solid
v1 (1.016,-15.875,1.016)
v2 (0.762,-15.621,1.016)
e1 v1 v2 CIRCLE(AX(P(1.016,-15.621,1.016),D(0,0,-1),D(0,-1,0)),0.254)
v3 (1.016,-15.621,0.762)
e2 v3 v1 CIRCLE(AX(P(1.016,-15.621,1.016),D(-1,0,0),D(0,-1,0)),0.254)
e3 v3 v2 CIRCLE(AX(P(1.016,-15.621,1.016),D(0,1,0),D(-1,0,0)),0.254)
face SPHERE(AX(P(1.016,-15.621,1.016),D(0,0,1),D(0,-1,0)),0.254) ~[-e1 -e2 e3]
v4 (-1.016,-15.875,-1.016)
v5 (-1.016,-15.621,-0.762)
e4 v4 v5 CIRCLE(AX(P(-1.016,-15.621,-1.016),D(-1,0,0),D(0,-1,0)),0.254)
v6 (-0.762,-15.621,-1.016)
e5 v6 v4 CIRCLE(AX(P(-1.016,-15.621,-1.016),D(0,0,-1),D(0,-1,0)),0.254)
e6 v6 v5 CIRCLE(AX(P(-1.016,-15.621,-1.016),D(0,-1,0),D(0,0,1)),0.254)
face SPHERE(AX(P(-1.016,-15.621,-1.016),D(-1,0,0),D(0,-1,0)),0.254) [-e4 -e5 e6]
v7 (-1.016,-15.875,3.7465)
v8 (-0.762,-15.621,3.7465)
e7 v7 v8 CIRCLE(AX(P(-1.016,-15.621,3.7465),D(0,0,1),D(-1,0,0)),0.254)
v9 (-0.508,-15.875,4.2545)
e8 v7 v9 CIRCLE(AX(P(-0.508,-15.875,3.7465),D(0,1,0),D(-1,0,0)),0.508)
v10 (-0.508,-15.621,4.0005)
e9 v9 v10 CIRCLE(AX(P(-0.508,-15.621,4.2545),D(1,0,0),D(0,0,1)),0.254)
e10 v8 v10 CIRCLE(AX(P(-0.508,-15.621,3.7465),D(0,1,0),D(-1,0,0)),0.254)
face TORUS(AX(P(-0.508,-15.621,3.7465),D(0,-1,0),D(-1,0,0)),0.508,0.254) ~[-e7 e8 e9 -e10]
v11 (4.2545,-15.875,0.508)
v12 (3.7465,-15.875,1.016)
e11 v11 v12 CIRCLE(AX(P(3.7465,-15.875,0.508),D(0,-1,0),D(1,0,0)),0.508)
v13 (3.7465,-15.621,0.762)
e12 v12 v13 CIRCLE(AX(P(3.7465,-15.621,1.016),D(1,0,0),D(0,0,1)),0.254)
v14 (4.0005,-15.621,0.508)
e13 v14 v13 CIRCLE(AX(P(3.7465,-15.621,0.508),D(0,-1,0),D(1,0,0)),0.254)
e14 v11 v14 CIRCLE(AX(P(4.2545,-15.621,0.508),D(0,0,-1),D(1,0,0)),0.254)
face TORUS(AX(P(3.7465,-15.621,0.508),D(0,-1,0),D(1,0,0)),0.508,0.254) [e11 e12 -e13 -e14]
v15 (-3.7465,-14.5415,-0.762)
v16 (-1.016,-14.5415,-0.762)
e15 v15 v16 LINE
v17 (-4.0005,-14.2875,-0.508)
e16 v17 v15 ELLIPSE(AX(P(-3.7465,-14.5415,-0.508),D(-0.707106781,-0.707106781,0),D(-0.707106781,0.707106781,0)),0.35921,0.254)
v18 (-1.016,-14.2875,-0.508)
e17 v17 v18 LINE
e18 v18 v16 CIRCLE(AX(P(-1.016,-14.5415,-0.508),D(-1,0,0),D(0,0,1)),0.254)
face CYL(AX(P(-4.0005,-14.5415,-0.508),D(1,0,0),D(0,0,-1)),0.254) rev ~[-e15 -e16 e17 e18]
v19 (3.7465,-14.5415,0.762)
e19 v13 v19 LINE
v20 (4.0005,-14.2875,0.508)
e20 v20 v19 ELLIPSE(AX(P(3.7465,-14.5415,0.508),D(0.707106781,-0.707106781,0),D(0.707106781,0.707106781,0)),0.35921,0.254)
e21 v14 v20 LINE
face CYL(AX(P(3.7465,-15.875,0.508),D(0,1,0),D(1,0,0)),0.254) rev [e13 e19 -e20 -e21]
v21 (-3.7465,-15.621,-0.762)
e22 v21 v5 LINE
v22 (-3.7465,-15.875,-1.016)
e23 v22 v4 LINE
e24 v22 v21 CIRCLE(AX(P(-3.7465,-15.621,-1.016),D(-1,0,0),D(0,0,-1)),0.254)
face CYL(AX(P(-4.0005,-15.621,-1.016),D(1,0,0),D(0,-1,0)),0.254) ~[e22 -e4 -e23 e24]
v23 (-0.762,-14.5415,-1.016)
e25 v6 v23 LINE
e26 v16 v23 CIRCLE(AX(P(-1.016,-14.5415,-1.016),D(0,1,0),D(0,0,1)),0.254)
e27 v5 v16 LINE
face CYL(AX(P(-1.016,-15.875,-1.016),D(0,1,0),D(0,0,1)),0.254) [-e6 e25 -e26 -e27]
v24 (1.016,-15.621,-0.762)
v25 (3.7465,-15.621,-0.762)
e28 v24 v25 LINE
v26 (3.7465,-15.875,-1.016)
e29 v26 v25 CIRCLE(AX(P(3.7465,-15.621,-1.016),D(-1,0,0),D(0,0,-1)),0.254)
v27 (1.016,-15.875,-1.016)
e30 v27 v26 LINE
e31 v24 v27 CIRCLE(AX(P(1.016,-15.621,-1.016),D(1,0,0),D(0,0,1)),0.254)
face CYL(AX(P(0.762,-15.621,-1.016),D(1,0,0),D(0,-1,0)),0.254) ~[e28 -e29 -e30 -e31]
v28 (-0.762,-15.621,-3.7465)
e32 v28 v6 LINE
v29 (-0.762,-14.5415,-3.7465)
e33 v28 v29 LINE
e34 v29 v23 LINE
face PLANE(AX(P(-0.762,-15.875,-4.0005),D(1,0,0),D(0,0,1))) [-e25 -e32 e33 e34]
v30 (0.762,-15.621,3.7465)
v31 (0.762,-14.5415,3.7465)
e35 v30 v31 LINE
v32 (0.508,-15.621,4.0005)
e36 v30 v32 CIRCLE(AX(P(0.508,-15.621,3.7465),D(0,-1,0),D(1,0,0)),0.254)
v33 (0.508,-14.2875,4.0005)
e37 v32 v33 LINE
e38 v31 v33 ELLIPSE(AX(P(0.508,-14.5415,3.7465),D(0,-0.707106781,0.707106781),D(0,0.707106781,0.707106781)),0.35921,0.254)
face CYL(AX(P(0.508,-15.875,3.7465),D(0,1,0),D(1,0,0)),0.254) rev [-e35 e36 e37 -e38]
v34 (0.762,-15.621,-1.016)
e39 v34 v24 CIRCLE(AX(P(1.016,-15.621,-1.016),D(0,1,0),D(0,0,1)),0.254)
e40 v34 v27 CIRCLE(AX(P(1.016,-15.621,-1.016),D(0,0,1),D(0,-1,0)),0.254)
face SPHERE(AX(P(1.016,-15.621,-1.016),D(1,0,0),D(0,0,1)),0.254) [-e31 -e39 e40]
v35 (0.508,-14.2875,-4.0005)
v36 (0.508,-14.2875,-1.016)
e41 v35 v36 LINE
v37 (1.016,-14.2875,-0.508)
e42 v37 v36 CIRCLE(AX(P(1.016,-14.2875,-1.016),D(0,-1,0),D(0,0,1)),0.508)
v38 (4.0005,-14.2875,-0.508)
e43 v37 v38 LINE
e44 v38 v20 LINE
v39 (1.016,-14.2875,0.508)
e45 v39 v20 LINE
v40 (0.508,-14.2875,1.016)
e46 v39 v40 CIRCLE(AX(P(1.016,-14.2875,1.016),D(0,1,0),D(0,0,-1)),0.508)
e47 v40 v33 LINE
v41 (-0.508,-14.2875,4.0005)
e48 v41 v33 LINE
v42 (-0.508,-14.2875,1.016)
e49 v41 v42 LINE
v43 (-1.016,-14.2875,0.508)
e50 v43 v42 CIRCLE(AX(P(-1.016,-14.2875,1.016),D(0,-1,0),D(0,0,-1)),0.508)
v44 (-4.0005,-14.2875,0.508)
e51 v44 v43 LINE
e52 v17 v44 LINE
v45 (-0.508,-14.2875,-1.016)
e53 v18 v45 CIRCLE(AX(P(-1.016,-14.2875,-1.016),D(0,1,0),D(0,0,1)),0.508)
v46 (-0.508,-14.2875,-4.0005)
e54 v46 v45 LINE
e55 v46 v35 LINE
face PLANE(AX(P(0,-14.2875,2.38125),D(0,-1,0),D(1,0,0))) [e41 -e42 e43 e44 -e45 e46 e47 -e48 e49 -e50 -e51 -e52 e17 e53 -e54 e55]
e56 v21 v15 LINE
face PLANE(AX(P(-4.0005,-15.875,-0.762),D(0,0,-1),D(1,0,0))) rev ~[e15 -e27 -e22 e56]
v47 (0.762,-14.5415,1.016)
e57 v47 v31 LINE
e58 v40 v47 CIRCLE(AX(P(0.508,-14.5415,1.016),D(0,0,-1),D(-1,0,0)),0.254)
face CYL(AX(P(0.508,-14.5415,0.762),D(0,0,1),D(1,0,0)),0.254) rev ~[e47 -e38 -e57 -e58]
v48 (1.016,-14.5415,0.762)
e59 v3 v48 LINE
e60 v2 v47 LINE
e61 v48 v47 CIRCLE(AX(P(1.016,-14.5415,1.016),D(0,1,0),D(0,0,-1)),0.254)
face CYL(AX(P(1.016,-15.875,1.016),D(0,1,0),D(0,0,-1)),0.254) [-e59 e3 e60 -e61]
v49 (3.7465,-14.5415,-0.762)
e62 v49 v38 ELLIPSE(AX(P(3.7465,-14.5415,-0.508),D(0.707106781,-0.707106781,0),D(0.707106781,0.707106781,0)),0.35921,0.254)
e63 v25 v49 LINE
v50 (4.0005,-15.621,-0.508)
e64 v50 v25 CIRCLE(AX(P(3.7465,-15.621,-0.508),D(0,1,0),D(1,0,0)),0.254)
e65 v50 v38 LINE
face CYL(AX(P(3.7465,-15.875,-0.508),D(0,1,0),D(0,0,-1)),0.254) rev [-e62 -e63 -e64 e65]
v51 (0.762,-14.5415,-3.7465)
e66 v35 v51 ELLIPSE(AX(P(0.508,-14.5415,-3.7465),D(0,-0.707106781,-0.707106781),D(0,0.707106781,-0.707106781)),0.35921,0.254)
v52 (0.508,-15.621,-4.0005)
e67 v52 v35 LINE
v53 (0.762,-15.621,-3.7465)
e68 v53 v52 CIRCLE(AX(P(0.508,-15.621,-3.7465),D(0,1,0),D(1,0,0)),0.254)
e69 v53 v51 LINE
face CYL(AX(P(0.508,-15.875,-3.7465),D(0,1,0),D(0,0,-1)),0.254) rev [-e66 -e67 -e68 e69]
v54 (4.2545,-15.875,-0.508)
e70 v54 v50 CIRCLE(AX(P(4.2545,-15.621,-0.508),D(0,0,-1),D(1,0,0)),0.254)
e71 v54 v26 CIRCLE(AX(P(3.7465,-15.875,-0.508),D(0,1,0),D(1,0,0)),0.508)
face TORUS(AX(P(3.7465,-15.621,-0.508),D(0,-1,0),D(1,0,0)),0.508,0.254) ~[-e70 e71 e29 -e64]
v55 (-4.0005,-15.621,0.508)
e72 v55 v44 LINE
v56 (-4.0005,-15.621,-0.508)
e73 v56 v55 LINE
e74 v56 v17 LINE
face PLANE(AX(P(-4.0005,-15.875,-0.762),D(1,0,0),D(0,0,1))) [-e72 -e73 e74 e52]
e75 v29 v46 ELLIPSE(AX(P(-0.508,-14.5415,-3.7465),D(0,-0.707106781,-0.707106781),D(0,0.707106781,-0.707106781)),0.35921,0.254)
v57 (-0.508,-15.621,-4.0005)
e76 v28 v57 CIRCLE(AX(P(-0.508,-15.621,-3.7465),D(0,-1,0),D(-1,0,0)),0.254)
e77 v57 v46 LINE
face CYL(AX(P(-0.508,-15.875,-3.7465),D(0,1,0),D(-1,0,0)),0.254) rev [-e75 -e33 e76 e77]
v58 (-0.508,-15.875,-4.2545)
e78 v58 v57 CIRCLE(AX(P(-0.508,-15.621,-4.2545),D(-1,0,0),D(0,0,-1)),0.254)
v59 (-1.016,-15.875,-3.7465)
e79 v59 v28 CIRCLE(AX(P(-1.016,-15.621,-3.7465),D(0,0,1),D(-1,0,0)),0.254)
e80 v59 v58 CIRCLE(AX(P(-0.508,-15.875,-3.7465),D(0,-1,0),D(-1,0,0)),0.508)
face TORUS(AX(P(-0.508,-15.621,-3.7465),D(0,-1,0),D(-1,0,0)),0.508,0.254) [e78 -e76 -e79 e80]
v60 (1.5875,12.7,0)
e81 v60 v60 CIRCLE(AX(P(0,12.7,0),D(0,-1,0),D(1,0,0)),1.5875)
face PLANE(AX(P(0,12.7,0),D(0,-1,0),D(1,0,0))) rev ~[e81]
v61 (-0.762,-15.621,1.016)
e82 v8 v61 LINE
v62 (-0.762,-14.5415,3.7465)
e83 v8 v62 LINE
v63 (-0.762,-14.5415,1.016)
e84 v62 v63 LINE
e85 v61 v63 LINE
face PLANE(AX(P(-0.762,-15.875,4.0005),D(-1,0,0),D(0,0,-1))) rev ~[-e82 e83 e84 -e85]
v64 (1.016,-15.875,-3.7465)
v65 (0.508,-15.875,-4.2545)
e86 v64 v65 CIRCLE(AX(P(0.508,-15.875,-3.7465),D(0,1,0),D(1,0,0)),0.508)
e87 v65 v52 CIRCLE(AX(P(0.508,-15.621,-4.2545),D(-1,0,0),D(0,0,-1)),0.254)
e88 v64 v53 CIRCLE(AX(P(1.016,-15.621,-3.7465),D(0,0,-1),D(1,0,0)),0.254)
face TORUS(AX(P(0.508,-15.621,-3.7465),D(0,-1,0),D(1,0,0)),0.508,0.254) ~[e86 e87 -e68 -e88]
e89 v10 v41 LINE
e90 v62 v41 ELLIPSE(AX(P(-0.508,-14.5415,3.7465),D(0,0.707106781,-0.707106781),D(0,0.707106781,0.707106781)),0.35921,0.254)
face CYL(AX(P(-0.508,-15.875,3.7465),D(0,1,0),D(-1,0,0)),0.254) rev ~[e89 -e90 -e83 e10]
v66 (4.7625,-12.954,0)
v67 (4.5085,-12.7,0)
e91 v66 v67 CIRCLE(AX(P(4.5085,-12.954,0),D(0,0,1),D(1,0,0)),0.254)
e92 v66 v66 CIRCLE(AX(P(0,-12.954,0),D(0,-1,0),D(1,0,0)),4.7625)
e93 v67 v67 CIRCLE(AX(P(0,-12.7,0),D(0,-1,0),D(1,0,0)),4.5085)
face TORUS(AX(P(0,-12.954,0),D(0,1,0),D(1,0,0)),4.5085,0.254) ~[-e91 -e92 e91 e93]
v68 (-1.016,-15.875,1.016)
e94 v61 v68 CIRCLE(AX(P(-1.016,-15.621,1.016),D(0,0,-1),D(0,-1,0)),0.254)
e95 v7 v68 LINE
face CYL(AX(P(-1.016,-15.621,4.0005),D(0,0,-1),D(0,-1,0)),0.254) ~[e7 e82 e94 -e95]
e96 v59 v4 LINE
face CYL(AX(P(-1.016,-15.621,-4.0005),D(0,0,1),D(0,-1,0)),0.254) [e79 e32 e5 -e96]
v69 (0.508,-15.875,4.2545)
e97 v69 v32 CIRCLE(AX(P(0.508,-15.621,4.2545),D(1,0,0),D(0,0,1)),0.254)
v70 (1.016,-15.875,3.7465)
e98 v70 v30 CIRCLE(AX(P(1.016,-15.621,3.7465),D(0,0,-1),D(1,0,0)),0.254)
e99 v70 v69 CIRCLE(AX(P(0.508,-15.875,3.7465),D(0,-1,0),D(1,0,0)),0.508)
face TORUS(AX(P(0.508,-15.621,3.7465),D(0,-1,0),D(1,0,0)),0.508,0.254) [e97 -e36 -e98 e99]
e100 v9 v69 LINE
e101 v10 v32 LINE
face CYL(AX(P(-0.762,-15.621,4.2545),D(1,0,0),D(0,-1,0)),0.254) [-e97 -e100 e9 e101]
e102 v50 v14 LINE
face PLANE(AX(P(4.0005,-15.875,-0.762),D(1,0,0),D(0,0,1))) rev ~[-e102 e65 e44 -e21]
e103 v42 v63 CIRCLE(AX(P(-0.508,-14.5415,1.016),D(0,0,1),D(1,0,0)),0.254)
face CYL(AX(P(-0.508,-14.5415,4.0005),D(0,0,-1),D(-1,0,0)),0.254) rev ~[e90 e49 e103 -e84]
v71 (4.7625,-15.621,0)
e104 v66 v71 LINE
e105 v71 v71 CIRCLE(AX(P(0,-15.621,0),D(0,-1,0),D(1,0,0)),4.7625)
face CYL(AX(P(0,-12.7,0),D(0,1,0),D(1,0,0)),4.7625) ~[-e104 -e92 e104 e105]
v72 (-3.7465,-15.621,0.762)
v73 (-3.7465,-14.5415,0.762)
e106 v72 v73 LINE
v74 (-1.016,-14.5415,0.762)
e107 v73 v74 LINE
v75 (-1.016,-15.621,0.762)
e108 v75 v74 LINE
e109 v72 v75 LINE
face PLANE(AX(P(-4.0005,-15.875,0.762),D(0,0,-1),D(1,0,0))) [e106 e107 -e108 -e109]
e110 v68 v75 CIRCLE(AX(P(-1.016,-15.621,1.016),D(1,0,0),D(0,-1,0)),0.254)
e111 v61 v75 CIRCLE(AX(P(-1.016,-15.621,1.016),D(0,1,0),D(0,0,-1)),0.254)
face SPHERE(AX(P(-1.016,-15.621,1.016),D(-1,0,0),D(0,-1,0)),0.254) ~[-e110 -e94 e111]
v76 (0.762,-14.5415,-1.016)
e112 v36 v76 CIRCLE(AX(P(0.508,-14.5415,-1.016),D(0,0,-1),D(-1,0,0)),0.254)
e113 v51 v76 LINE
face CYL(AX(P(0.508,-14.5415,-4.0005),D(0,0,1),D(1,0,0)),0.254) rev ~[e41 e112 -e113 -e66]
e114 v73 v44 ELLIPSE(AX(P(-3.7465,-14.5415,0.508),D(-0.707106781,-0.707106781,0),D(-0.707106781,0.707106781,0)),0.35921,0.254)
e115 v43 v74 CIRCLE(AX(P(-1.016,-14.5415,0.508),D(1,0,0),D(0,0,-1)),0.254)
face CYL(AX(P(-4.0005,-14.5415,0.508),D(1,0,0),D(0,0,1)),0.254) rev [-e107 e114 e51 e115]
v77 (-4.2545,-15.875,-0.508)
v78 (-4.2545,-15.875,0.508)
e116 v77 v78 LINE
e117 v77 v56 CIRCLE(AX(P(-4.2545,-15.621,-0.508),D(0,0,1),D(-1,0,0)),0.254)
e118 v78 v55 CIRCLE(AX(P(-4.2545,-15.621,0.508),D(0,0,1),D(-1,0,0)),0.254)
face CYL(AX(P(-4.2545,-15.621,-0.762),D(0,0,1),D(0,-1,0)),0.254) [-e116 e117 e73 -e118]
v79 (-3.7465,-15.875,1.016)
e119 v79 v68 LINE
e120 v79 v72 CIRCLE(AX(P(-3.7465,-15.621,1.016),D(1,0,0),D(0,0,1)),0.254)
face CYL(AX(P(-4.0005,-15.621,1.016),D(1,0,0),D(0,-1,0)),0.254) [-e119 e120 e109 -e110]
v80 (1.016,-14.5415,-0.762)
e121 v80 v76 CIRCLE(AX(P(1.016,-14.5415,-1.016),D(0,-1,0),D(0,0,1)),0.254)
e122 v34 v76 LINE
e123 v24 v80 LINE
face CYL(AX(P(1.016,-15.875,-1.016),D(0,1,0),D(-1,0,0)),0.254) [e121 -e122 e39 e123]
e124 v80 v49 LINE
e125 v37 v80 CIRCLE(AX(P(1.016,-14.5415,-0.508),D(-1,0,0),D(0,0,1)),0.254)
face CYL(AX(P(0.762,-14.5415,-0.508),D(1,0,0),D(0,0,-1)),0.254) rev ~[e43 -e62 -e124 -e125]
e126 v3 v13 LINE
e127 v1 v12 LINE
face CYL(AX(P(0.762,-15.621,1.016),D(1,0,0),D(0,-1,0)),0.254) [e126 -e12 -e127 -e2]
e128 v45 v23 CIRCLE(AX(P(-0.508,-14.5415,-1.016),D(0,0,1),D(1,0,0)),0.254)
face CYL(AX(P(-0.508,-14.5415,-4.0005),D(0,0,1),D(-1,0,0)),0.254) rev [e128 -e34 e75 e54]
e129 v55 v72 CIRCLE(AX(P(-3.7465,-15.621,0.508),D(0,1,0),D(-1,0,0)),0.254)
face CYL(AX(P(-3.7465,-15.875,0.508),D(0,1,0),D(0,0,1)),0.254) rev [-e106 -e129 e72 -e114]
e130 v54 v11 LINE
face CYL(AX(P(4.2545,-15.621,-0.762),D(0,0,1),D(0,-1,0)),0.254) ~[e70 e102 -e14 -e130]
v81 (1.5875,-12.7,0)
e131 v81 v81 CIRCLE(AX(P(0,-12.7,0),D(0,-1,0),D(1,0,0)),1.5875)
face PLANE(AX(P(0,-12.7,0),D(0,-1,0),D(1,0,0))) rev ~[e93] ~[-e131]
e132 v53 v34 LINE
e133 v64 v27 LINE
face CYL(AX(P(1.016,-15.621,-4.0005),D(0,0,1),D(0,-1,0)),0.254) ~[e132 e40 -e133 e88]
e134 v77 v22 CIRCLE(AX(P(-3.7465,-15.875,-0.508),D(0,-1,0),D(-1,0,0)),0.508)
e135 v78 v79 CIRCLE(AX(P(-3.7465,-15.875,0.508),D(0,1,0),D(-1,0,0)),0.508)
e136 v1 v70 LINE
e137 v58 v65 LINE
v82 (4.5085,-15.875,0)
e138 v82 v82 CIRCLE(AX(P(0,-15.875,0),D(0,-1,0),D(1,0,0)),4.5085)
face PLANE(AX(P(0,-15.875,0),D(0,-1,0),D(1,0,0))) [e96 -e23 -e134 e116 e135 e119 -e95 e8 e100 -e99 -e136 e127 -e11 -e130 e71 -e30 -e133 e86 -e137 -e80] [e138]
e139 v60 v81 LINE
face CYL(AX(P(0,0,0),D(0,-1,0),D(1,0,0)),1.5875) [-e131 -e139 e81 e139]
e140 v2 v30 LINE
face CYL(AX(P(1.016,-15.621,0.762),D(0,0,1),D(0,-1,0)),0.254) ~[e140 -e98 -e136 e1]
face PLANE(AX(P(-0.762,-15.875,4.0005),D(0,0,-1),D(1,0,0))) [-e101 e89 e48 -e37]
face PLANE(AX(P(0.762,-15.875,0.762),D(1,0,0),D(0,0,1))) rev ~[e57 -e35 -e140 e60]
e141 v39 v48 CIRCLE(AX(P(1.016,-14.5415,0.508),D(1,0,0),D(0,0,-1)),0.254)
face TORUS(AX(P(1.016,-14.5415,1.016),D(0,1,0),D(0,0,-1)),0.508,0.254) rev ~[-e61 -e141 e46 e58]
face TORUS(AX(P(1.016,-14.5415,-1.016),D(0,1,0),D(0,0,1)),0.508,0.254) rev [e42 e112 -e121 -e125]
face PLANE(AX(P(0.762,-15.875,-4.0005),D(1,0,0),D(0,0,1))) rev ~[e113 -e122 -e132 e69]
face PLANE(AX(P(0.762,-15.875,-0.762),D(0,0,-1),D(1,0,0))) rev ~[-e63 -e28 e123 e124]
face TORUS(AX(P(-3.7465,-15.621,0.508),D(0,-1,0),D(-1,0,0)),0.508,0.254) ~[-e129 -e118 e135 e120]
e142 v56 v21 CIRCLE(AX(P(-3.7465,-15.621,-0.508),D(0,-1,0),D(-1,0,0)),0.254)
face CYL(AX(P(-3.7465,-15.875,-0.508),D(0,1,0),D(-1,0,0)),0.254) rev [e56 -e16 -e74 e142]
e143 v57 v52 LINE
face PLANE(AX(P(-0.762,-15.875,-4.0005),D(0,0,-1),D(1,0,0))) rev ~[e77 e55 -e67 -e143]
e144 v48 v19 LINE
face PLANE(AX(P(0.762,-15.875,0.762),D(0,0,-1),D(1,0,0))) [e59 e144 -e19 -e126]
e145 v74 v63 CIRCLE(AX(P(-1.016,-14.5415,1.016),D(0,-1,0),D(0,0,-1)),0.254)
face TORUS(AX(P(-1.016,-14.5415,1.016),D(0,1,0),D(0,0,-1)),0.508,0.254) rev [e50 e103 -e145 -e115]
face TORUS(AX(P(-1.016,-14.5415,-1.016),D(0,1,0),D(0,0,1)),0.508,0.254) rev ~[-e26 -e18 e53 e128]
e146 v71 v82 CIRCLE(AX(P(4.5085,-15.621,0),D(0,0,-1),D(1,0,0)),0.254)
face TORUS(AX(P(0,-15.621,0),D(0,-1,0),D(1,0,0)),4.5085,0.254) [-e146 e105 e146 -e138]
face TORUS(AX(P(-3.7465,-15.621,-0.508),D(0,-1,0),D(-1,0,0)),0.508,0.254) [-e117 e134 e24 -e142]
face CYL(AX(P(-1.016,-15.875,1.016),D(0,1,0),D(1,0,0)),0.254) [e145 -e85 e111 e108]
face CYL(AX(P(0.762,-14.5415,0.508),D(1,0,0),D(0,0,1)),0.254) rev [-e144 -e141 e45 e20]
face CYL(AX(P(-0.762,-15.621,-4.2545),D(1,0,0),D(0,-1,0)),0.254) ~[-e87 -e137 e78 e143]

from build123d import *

# Parameters (mm, degrees)
F0_R     = 1.5875
F1_DEPTH = 12.7
F2_R     = 4.7625
F3_DEPTH = 3.175
F4_W     = 1.524
F4_H     = 3.2385
F4_H_2   = 1.524
F4_W_2   = 3.2385
F5_DEPTH = 1.5875
F6_R     = 0.254


with BuildPart() as f1:
    # F0 (on Front) → F1 (new body, symmetric)
    with BuildSketch(Plane.XZ):
        Circle(F0_R)
    extrude(amount=F1_DEPTH, both=True)

    # F2 (on face) → F3 (join)
    with BuildSketch(Plane.XZ.offset(12.7)):
        Circle(F2_R)
    extrude(amount=F3_DEPTH)

    # F4 (on face) → F5 (cut)
    with BuildSketch(Plane.XZ.offset(15.875)):
        with Locations((0, 2.38125)):
            Rectangle(F4_W, F4_H)
        Rectangle(F4_W, F4_H_2)
        with Locations((-2.38125, 0)):
            Rectangle(F4_W_2, F4_H_2)
        with Locations((2.38125, 0)):
            Rectangle(F4_W_2, F4_H_2)
        with Locations((0, -2.38125)):
            Rectangle(F4_W, F4_H)
    extrude(amount=-F5_DEPTH, mode=Mode.SUBTRACT)

    # F6
    f6_edges = [f1.edges().sort_by_distance(p)[0] for p in [
        (-4.7625, -15.875, 0),
        (-2.38125, -15.875, 0.762),
        (-0.762, -15.875, 2.38125),
        (0.762, -15.875, 2.38125),
        (-2.38125, -15.875, -0.762),
        (-0.762, -15.875, -2.38125),
        (2.38125, -15.875, -0.762),
        (2.38125, -15.875, 0.762),
        (-0.762, -15.08125, 0.762),
        (-4.0005, -15.08125, 0.762),
        (-2.38125, -14.2875, 0.762),
        (4.0005, -15.08125, 0.762),
        (0.762, -15.08125, 0.762),
        (2.38125, -14.2875, 0.762),
        (-4.0005, -15.08125, -0.762),
        (-0.762, -15.08125, -0.762),
        (-2.38125, -14.2875, -0.762),
        (0.762, -15.08125, -0.762),
        (4.0005, -15.08125, -0.762),
        (2.38125, -14.2875, -0.762),
        (0, -15.875, 4.0005),
        (0, -15.875, -4.0005),
        (0.762, -15.08125, 4.0005),
        (-0.762, -15.08125, 4.0005),
        (0.762, -15.08125, -4.0005),
        (-0.762, -15.08125, -4.0005),
        (-4.7625, -12.7, 0),
        (-4.0005, -15.875, 0),
        (0.762, -15.875, -2.38125),
        (4.0005, -15.875, 0),
        (-0.762, -14.2875, 2.38125),
        (-0.762, -14.2875, -2.38125),
        (0.762, -14.2875, -2.38125),
        (0.762, -14.2875, 2.38125),
    ]]
    fillet(f6_edges, radius=F6_R)


solid = f1.part
